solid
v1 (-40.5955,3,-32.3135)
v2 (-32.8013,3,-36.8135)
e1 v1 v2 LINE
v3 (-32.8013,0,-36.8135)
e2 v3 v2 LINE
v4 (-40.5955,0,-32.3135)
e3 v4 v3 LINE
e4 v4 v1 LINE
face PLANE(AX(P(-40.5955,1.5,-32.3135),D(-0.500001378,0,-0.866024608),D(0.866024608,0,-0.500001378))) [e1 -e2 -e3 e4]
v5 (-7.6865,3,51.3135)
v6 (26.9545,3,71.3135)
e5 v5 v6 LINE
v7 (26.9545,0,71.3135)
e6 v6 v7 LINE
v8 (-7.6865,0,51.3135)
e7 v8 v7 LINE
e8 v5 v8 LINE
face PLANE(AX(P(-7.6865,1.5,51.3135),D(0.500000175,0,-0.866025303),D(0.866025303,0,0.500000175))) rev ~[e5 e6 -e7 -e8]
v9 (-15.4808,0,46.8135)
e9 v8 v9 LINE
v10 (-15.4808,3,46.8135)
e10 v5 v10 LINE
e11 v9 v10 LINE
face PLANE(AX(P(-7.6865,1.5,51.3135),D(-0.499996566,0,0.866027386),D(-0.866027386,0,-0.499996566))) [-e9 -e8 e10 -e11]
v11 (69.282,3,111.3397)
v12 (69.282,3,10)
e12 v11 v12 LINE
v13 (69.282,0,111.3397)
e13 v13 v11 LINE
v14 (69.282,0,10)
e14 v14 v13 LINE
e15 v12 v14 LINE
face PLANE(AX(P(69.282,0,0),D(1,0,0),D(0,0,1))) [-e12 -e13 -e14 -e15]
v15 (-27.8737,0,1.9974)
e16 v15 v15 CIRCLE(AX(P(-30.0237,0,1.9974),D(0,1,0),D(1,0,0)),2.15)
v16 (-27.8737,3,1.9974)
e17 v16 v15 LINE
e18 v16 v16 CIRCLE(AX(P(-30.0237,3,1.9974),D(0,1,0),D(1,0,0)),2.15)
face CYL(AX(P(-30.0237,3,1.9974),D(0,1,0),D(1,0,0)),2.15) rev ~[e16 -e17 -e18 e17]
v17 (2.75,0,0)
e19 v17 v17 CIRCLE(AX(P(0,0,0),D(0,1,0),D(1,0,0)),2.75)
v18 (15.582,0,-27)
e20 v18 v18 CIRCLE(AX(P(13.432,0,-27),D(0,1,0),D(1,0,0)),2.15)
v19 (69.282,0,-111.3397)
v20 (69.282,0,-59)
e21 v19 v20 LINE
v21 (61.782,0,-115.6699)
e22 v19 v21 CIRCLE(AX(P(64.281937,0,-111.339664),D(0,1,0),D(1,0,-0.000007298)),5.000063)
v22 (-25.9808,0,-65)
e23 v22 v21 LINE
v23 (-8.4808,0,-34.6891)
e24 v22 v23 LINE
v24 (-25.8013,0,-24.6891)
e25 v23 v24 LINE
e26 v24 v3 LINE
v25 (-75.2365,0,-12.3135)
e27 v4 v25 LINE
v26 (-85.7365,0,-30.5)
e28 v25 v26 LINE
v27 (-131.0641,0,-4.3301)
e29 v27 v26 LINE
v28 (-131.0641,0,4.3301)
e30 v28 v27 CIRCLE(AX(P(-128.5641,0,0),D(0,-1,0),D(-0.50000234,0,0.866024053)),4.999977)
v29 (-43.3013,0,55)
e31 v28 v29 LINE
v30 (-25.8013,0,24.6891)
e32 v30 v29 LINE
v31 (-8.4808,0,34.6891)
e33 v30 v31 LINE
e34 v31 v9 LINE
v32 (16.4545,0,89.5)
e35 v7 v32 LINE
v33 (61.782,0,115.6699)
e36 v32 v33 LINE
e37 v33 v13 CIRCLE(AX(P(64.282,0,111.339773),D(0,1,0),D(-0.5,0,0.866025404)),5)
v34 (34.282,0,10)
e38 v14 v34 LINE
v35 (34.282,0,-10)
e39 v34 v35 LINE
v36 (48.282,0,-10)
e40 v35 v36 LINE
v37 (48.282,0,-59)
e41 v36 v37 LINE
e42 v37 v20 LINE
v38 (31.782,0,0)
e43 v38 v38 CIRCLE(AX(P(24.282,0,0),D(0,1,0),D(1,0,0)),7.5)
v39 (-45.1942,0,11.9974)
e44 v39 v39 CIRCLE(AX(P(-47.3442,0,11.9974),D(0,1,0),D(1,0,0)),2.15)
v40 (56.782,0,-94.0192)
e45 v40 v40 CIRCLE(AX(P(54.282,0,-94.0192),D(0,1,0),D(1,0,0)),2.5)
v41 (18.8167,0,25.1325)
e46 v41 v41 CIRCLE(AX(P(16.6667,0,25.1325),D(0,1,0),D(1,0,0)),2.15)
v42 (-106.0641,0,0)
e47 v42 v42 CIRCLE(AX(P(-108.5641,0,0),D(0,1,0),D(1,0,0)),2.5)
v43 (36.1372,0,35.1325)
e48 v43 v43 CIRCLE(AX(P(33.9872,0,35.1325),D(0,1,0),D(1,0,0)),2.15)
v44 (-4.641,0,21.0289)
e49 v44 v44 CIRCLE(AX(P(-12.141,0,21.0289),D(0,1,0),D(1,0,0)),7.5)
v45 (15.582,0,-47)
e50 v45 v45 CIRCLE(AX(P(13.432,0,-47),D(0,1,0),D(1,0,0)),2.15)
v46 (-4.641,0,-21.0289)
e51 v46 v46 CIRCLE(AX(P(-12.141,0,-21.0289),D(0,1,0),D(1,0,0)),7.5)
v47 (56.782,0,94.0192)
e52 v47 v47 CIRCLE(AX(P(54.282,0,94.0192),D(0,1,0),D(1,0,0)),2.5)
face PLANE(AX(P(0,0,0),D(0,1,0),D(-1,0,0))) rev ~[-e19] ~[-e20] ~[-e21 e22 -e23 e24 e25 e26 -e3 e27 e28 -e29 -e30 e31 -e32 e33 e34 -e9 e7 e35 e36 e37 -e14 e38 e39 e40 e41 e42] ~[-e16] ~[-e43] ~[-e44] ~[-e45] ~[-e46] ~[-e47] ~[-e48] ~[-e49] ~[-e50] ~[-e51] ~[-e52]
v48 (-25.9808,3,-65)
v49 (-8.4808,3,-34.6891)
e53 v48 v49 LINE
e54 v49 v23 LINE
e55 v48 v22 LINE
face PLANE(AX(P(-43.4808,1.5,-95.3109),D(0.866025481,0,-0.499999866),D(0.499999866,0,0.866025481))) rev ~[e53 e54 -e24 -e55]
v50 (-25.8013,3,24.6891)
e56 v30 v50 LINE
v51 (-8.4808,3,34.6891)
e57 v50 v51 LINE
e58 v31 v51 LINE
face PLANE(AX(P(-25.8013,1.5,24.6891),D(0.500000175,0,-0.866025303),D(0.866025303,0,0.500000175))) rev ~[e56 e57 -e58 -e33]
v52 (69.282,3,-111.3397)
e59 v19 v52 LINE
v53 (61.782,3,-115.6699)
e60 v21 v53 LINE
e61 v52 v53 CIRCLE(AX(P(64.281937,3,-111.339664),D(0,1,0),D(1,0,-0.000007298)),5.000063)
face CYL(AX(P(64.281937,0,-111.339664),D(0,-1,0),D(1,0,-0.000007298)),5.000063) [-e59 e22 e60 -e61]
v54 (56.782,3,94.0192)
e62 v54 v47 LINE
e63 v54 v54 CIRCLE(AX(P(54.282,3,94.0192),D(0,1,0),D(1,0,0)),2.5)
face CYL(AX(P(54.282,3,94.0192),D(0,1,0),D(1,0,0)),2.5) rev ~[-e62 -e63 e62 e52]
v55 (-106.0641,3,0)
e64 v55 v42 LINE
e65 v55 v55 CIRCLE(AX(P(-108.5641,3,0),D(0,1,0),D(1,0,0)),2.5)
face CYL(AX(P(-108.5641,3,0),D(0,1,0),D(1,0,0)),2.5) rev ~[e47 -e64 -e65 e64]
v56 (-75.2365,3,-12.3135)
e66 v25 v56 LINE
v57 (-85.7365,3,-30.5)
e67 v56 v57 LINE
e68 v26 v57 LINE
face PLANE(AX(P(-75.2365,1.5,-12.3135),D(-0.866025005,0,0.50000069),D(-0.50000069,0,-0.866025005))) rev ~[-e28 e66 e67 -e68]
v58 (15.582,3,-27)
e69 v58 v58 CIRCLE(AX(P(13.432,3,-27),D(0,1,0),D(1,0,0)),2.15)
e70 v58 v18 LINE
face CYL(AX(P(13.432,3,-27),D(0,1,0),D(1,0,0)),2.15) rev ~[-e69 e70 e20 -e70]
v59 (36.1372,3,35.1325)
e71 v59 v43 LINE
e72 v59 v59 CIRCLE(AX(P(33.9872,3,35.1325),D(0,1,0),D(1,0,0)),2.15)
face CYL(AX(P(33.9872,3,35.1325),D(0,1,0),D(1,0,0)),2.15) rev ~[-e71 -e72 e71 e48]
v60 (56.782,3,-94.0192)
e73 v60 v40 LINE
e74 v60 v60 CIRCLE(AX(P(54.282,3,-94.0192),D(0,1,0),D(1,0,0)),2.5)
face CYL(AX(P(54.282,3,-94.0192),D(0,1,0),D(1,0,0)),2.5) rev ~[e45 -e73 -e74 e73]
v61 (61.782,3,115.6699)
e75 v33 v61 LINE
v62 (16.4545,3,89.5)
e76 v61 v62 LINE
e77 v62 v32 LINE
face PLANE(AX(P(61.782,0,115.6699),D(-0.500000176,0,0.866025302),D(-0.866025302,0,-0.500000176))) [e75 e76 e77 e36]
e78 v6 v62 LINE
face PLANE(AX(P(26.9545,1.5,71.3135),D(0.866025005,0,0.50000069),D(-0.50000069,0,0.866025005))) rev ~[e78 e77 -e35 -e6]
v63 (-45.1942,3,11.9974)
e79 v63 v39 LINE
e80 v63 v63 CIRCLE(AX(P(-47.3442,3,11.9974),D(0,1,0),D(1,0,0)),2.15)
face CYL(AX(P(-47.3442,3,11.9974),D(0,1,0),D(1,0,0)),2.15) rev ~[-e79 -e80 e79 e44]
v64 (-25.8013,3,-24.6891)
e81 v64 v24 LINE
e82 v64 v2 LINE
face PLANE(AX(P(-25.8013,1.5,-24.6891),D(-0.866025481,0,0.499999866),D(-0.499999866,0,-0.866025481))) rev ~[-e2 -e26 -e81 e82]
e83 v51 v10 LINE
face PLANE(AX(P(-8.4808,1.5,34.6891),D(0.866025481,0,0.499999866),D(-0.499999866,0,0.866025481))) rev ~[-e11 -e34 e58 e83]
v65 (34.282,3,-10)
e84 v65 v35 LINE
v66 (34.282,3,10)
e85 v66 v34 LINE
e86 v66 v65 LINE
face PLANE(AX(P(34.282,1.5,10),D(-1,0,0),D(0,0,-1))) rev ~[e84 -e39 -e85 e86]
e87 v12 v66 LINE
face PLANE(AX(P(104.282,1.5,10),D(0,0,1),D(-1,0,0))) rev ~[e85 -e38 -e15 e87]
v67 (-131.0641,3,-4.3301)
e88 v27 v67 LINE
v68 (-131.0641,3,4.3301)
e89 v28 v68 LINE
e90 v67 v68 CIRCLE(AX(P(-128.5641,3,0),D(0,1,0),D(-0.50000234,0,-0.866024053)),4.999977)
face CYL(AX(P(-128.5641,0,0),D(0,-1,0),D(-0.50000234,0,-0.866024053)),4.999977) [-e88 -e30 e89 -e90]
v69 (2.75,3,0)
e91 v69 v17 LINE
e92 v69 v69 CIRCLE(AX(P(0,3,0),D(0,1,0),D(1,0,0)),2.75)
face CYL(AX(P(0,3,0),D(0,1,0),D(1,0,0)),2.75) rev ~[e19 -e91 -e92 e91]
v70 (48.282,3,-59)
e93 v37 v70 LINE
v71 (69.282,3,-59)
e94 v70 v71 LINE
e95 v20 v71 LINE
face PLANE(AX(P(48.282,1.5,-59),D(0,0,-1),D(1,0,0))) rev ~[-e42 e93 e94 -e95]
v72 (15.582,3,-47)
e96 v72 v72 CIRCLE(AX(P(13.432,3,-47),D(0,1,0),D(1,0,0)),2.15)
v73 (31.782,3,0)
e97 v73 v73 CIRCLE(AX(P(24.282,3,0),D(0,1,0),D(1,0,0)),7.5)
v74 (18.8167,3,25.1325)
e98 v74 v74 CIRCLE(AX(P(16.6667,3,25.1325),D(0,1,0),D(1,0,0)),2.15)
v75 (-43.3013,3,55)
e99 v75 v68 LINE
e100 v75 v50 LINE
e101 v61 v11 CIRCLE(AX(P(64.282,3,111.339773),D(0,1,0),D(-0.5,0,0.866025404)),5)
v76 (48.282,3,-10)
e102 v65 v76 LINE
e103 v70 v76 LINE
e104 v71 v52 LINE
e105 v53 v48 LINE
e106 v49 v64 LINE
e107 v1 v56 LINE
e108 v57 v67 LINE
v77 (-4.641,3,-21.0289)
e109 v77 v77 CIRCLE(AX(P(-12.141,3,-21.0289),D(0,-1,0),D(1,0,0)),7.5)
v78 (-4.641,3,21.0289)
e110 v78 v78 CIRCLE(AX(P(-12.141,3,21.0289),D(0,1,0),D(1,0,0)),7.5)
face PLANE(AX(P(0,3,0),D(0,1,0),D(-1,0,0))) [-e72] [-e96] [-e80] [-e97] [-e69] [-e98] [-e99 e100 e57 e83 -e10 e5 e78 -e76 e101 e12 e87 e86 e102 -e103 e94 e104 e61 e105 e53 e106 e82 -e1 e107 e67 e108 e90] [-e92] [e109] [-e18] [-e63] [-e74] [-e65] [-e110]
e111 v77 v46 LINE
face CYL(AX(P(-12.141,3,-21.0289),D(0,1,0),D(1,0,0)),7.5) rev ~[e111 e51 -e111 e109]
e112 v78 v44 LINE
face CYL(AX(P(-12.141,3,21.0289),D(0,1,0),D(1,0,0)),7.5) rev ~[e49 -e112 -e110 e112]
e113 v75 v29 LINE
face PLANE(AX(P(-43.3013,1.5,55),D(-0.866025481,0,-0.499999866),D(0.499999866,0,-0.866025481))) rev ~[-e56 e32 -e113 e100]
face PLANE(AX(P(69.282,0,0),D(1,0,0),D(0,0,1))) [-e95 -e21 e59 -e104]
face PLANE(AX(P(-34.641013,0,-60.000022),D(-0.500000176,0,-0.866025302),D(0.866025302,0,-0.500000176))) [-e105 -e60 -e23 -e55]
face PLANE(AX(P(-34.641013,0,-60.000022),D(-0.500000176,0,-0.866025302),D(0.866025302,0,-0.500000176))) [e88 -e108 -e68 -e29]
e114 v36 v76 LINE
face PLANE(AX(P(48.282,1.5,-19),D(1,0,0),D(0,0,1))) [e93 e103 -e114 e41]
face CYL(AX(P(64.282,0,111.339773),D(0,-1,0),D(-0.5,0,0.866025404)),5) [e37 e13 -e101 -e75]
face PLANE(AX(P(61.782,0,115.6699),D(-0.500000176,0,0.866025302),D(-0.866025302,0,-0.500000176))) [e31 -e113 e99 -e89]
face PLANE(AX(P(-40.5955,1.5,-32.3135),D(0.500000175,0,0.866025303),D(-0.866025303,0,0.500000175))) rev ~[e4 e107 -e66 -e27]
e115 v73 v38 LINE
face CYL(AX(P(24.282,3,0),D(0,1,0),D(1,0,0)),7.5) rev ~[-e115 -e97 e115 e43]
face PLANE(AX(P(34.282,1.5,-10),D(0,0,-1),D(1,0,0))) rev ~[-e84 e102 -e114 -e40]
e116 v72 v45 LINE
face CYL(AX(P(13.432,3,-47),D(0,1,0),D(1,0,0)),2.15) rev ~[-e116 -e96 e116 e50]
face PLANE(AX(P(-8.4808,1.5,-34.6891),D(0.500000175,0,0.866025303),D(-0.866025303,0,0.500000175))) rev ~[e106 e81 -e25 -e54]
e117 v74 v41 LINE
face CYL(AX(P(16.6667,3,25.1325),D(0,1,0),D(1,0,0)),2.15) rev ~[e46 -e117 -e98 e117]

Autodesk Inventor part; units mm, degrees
ref_plane "YZ Plane" through (0, 0, 0) normal (1, 0, 0) x (0, 1, 0)
ref_plane "XZ Plane" through (0, 0, 0) normal (0, 1, 0) x (-1, 0, 0)
ref_plane "XY Plane" through (0, 0, 0) normal (0, 0, 1) x (1, 0, 0)
sketch "Sketch1" plane through (0, 0, 0) normal (0, 1, 0) x (-1, 0, 0)
  line L0 (-61.782, 115.6699) -> (131.0641, 4.3301)
  line L1 (131.0641, -4.3301) -> (-61.782, -115.6699)
  line L2 (-69.282, -111.3397) -> (-69.282, 111.3397)
  arc A0 (131.0641, -4.3301) -> (131.0641, 4.3301) centre (128.5641, 0) ccw
  arc A1 (-69.282, -111.3397) -> (-61.782, -115.6699) centre (-64.282, -111.3397) ccw
  arc A2 (-61.782, 115.6699) -> (-69.282, 111.3397) centre (-64.282, 111.3397) ccw
  line L3 (34.641, -60) -> (-45.6615, 79.088)
  line L4 (-69.282, 0) -> (190.0751, 0)
  line L5 (34.641, 60) -> (-41.8401, -72.4692)
  circle A3 centre (0, 0) radius 2.5
  point P0 (0, 0)
  point P1 (-69.282, 120)
  point P2 (-69.282, -120)
  dimension "d5" = 240
  dimension "d9" = 60
  dimension "d10" = 60
  dimension "d14" = 5
  dimension "d25" = 5
extrude "Extrusion1" add sketch "Sketch1" along normal blind 3
sketch "Sketch2" plane through (0, 3, 0) normal (0, 1, 0) x (1, 0, 0)
  point P0 (0, 0)
ref_plane "Work Plane1" through (0, 1.5, 0) normal (0, 1, 0) x (1, 0, 0)
ref_plane "Work Plane2" through (0, 3, 0) normal (0.8660254, 0, 0.5) x (0, 1, 0)
ref_plane "Work Plane3" through (0, 3, 0) normal (-0.8660254, 0, 0.5) x (0, -1, 0)
ref_plane "Work Plane4" through (0, 3, 0) normal (0, 0, 1) x (1, 0, 0)
sketch "Sketch4" plane through (0, 3, 0) normal (0, 1, 0) x (1, 0, 0)
  point P0 (0, 0)
ref_plane "Work Plane5" through (0, 1.5, 0) normal (0, 1, 0) x (1, 0, 0)
ref_plane "Work Plane6" through (51.6025, 3, -19) normal (0, 0, 1) x (1, 0, 0)
sketch "Sketch7" plane through (0, 1.5, 0) normal (0, 1, 0) x (1, 0, 0)
  line L0 (-16.8875, -70.25) -> (-16.8875, -70.25)
  line L1 (-16.8875, -70.25) -> (-16.8875, -70.25)
  line L2 (-25.9808, -65) -> (-18.1865, -69.5)
  line L3 (-14.8875, -66.7859) -> (-16.8875, -70.25)
  line L4 (-14.1375, -65.4869) -> (-19.6375, -75.0131)
  line L5 (-19.6375, -75.0131) -> (-37.824, -64.5131)
  line L6 (-32.324, -54.9869) -> (-19.6375, -75.0131) construction
  line L7 (-37.824, -64.5131) -> (-32.324, -54.9869)
  line L8 (-37.824, -64.5131) -> (-14.1375, -65.4869) construction
  line L9 (-32.324, -54.9869) -> (-14.1375, -65.4869)
  line L10 (-8.4808, -34.6891) -> (-43.4808, -95.3109)
  line L11 (-60.8013, -85.3109) -> (-8.4808, -34.6891) construction
  line L12 (-60.8013, -85.3109) -> (-25.8013, -24.6891)
  line L13 (-25.8013, -24.6891) -> (-43.4808, -95.3109) construction
  line L14 (-7.6865, -51.3135) -> (-15.4808, -46.8135)
  line L15 (-25.9808, -65) -> (-8.4808, -34.6891)
  line L16 (-25.8013, -24.6891) -> (-8.4808, -34.6891)
  line L17 (-16.8875, -70.25) -> (-14.8875, -66.7859)
  line L18 (-18.1865, -69.5) -> (-7.6865, -51.3135)
  line L19 (16.4545, -89.5) -> (-18.1865, -69.5)
  line L20 (-7.6865, -51.3135) -> (26.9545, -71.3135)
  line L21 (26.9545, -71.3135) -> (16.4545, -89.5)
  line L22 (-14.8875, -66.7859) -> (-14.8875, -66.7859)
  line L23 (-43.4808, -95.3109) -> (-60.8013, -85.3109)
  line L24 (-34.641, -60) -> (-25.9808, -65)
  line L25 (-131.0641, -4.3301) -> (61.782, -115.6699) projected
  line L26 (69.282, 20.5) -> (69.282, 20.5)
  line L27 (69.282, 20.5) -> (69.282, 20.5)
  line L28 (104.282, 10) -> (104.282, -10)
  line L29 (74.782, -0.5) -> (63.782, -0.5)
  line L30 (69.282, 0) -> (69.282, 10)
  line L31 (104.282, -10) -> (34.282, -10)
  line L32 (63.782, -0.5) -> (74.782, 20.5) construction
  line L33 (74.782, 20.5) -> (74.782, -0.5)
  line L34 (104.282, -10) -> (34.282, 10) construction
  line L35 (34.282, -10) -> (104.282, 10) construction
  line L36 (63.782, -0.5) -> (63.782, 20.5)
  line L37 (74.782, -0.5) -> (63.782, 20.5) construction
  line L38 (34.282, -10) -> (34.282, 10)
  line L39 (34.282, 10) -> (104.282, 10)
  line L40 (69.282, 10) -> (34.282, 10)
  line L41 (65.282, 20.5) -> (69.282, 20.5)
  line L42 (65.282, 20.5) -> (65.282, 20.5)
  line L43 (69.282, 20.5) -> (65.282, 20.5)
  line L44 (63.782, 20.5) -> (74.782, 20.5)
  line L45 (69.282, 19) -> (48.282, 19)
  line L46 (69.282, 59) -> (69.282, 19)
  line L47 (69.282, 10) -> (69.282, 19)
  line L48 (48.282, 59) -> (69.282, 59)
  line L49 (48.282, 19) -> (48.282, 10)
  line L50 (48.282, 19) -> (48.282, 59)
  line L51 (-52.3945, 49.75) -> (-52.3945, 49.75)
  line L52 (-52.3945, 49.75) -> (-52.3945, 49.75)
  line L53 (-60.8013, 85.3109) -> (-43.4808, 95.3109)
  line L54 (-36.958, 65.0131) -> (-31.458, 55.4869)
  line L55 (-34.641, 60) -> (-43.3013, 55)
  line L56 (-43.4808, 95.3109) -> (-8.4808, 34.6891)
  line L57 (-31.458, 55.4869) -> (-55.1445, 54.5131) construction
  line L58 (-55.1445, 54.5131) -> (-36.958, 65.0131)
  line L59 (-43.4808, 95.3109) -> (-25.8013, 24.6891) construction
  line L60 (-8.4808, 34.6891) -> (-60.8013, 85.3109) construction
  line L61 (-31.458, 55.4869) -> (-49.6445, 44.9869)
  line L62 (-36.958, 65.0131) -> (-49.6445, 44.9869) construction
  line L63 (-8.4808, 34.6891) -> (-25.8013, 24.6891)
  line L64 (-25.8013, 24.6891) -> (-60.8013, 85.3109)
  line L65 (-43.3013, 55) -> (-25.8013, 24.6891)
  line L66 (-50.3945, 46.2859) -> (-52.3945, 49.75)
  line L67 (-50.3945, 46.2859) -> (-50.3945, 46.2859)
  line L68 (-52.3945, 49.75) -> (-50.3945, 46.2859)
  line L69 (-49.6445, 44.9869) -> (-55.1445, 54.5131)
  line L70 (-51.0955, 50.5) -> (-40.5955, 32.3135)
  line L71 (-85.7365, 30.5) -> (-51.0955, 50.5)
  line L72 (-43.3013, 55) -> (-51.0955, 50.5)
  line L73 (-75.2365, 12.3135) -> (-85.7365, 30.5)
  line L74 (-40.5955, 32.3135) -> (-32.8013, 36.8135)
  line L75 (-40.5955, 32.3135) -> (-75.2365, 12.3135)
  point P0 (0, 0)
  point P1 (-34.641, -60)
  point P2 (-16.8875, -70.25)
  point P3 (-28.7308, -69.7631)
  point P4 (-34.641, -60)
  point P5 (0, 0)
  point P6 (69.282, 111.3397)
  point P7 (69.282, 0)
  point P8 (69.282, 0)
  point P9 (0, 0)
  point P10 (-131.0641, 4.3301)
  point P11 (-34.641, 60)
  point P12 (-34.641, 60)
  point P13 (69.282, 20.5)
  point P14 (74.782, 10)
  point P15 (-52.3945, 49.75)
  point P16 (-46.0513, 59.7631)
  dimension "d59" = 10
  dimension "d60" = 35
  dimension "d61" = 11
  dimension "d62" = 21
  dimension "d63" = 4
  dimension "d64" = 9
  dimension "d65" = 21
  dimension "d66" = 40
  dimension "d129" = 360
extrude "Extrusion3" cut sketch "Sketch7" along normal mid plane 3
ref_plane "Work Plane8" through (-0.6865, 0, 39.1891) normal (-0.8660254, 0, -0.5) x (-0.5, 0, 0.8660254)
sketch "Sketch13" plane through (0, 3, 0) normal (0, 1, 0) x (1, 0, 0)
  circle A0 centre (0, 0) radius 2.75
  dimension "d124" = 5.5
extrude "Extrusion7" cut sketch "Sketch13" against normal through all
ref_plane "Work Plane9" through (-33.5955, 0, -20.1891) normal (0.8660254, 0, -0.5) x (-0.5, 0, -0.8660254)
sketch "Sketch15" plane through (0, 3, 0) normal (0, 1, 0) x (1, 0, 0)
  circle A0 centre (-108.5641, 0) radius 2.5 projected
  circle A1 centre (-108.5641, 0) radius 2.5
  circle A2 centre (54.282, -94.0192) radius 2.5
  circle A3 centre (54.282, 94.0192) radius 2.5
  point P0 (0, 0)
  dimension "d152" = 360
extrude "Extrusion9" cut sketch "Sketch15" against normal blind 10
sketch "Sketch16" plane through (0, 3, 0) normal (0, 1, 0) x (1, 0, 0)
  circle A0 centre (16.6667, -25.1325) radius 2.15 projected
  circle A1 centre (33.9872, -35.1325) radius 2.15 projected
  circle A2 centre (13.432, 27) radius 2.15 projected
  circle A3 centre (13.432, 47) radius 2.15 projected
  circle A4 centre (-47.3442, -11.9974) radius 2.15 projected
  circle A5 centre (-30.0237, -1.9974) radius 2.15 projected
  point P0 (0, 0)
extrude "Extrusion10" cut sketch "Sketch16" against normal through all
sketch "Sketch17" plane through (0, 3, 0) normal (0, 1, 0) x (1, 0, 0)
  line L0 (-25.8013, 24.6891) -> (-8.4808, 34.6891) projected
  line L1 (-17.141, 29.6891) -> (-7.7719, 13.4613)
  line L2 (-8.4808, 34.6891) -> (-25.8013, 24.6891) projected
  line L3 (-17.141, 29.6891) -> (-12.141, 21.0289)
  circle A0 centre (-12.141, 21.0289) radius 7.5
  circle A1 centre (-12.141, -21.0289) radius 7.5
  circle A2 centre (24.282, 0) radius 7.5
  point P0 (0, 0)
  dimension "d158" = 10
  dimension "d159" = 15
  dimension "d162" = 360
extrude "Extrusion11" cut sketch "Sketch17" against normal blind 10
properties part number "baseplate" material "PET Plastic"
